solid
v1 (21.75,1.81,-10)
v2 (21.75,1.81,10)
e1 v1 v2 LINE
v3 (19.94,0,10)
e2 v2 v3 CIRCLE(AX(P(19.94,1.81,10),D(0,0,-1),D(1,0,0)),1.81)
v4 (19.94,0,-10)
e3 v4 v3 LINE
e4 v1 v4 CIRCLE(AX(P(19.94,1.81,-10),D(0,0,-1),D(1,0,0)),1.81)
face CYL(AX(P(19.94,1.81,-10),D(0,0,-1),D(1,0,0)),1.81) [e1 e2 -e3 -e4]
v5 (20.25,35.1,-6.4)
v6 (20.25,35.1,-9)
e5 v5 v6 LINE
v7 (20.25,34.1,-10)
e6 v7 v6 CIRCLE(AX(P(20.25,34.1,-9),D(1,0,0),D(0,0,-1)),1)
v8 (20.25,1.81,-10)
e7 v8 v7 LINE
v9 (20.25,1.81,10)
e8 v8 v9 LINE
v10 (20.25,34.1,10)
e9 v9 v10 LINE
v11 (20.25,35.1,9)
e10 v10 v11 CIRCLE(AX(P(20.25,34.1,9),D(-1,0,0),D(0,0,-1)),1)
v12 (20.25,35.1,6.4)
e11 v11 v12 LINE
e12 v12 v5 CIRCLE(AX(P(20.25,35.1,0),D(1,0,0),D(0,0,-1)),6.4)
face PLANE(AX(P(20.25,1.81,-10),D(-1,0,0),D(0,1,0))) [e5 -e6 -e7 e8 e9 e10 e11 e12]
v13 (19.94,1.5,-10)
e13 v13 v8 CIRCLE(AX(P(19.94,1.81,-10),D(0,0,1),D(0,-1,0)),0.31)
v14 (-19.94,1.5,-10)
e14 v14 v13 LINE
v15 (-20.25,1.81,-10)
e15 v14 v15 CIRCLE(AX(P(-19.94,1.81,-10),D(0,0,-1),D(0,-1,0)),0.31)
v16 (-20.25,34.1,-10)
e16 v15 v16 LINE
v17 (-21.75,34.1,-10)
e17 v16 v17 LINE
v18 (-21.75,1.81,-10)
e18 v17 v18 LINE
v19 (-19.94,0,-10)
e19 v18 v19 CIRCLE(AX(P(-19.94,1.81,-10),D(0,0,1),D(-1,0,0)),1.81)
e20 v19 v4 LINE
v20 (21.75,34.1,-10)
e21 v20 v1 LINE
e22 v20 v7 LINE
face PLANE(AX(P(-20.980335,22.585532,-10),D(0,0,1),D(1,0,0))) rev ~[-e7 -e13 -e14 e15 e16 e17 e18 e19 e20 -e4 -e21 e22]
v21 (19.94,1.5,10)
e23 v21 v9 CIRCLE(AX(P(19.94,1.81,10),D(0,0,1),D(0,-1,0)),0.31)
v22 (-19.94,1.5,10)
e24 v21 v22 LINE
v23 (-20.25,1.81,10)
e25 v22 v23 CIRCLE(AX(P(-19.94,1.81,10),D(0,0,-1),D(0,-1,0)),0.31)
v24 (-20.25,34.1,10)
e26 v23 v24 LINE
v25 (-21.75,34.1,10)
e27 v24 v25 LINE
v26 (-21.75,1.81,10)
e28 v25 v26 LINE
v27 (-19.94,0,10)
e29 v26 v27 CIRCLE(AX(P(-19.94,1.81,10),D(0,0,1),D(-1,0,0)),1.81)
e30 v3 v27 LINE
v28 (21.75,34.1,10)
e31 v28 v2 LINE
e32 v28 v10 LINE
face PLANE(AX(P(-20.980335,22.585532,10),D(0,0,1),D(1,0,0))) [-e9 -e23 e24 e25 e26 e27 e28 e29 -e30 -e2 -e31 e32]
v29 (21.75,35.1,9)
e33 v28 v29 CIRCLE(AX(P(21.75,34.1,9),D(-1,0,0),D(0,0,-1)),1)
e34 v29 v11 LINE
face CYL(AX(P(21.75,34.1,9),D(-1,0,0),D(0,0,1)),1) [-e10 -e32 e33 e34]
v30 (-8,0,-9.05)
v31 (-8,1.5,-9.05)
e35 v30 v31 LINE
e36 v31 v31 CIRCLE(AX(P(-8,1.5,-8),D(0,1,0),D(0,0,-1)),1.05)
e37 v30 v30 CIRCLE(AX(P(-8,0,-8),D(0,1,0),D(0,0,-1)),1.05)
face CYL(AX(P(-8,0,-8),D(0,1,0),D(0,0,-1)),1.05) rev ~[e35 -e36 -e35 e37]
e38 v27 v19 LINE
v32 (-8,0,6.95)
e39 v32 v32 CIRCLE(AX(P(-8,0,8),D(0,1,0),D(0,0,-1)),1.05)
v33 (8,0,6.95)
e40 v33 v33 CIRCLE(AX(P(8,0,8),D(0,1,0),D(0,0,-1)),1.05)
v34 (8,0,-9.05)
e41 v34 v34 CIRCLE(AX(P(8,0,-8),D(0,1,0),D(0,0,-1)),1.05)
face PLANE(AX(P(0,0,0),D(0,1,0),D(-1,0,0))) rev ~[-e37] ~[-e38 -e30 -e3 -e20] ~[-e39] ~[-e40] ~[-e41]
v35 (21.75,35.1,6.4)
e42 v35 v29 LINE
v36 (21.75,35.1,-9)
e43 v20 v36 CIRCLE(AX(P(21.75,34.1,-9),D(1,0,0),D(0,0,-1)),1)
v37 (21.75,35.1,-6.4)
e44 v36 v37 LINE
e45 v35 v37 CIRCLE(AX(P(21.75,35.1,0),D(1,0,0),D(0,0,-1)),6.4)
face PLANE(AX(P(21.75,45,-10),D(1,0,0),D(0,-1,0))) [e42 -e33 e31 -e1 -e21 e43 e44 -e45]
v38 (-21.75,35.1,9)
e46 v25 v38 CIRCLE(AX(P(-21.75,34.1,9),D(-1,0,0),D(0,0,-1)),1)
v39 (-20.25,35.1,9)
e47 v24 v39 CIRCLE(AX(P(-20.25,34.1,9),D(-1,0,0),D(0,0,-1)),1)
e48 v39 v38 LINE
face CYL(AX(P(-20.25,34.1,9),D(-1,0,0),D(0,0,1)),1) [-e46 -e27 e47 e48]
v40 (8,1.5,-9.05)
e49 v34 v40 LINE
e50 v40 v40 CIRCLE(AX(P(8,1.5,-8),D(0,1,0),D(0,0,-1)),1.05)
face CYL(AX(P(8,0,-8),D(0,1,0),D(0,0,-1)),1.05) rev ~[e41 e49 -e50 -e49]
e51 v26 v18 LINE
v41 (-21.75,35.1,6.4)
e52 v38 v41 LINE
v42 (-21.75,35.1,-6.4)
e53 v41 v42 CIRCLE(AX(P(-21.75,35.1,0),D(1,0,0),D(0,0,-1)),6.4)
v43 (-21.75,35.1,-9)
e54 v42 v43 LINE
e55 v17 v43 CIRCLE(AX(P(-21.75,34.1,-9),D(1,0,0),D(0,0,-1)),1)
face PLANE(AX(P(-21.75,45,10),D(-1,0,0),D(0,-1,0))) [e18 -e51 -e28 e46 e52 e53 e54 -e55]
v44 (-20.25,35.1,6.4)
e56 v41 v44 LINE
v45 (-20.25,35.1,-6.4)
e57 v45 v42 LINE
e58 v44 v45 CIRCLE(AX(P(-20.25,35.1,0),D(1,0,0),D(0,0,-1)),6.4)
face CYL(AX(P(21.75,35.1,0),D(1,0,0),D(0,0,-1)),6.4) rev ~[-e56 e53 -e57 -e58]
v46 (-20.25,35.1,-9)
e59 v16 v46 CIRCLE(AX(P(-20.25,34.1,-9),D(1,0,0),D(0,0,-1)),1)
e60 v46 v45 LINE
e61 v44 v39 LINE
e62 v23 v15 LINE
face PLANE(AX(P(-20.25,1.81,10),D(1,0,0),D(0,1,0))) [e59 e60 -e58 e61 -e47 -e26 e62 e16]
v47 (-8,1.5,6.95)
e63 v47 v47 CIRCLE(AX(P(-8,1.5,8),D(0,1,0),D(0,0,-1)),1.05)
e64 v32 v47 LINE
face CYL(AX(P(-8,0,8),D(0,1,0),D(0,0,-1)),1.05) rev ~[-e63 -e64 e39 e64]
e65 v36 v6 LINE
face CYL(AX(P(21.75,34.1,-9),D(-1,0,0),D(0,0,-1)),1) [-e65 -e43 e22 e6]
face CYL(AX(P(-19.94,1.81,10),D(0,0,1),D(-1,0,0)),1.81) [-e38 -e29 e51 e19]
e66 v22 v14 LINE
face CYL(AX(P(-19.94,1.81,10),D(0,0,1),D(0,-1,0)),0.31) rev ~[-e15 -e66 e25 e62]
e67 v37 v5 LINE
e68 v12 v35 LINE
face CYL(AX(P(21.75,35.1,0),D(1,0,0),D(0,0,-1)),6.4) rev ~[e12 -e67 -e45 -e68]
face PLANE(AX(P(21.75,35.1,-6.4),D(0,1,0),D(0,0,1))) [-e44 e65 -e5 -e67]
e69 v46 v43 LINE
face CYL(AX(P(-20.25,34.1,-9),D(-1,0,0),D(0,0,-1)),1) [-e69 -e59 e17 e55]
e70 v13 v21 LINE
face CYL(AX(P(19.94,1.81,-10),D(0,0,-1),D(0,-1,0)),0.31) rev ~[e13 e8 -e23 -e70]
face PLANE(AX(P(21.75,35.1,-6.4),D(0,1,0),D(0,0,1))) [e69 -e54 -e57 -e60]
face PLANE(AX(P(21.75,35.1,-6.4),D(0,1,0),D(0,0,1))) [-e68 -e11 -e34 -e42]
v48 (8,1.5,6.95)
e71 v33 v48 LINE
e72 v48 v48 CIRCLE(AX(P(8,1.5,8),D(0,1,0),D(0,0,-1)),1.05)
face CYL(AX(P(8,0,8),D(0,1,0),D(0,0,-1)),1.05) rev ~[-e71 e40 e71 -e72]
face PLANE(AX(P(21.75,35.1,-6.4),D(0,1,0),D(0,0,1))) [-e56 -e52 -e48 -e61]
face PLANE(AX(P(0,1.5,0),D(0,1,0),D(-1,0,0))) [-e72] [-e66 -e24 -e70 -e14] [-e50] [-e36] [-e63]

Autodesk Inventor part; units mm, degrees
ref_plane "YZ Plane" through (0, 0, 0) normal (1, 0, 0) x (0, 1, 0)
ref_plane "XZ Plane" through (0, 0, 0) normal (0, 1, 0) x (-1, 0, 0)
ref_plane "XY Plane" through (0, 0, 0) normal (0, 0, 1) x (1, 0, 0)
sketch "Sketch1" plane through (0, 0, 0) normal (0, 1, 0) x (-1, 0, 0)
  line L0 (20.25, -10) -> (-20.25, -10)
  line L1 (-20.25, -10) -> (-20.25, 10)
  line L2 (-20.25, 10) -> (20.25, 10)
  line L3 (20.25, 10) -> (20.25, -10)
  point P0 (0, 0)
  dimension "d0" = 40.5
  dimension "d1" = 20
  dimension "d2" = 10
  dimension "d3" = 20.25
extrude "Plate1" add sketch "Sketch1" along normal blind 1.5
sketch "Sketch2" plane through (21.75, 0, -10) normal (-1, 0, 0) x (0, -1, 0)
  line L0 (0, 20) -> (0, 0)
  line L1 (0, 0) -> (-45, 0)
  line L2 (-45, 0) -> (-45, 20)
  line L3 (-45, 20) -> (0, 20)
edge flange "Flange1" height 45 angle 90 thickness 1.5 bend radius 0.31 thickness toward (-1, 0, 0) relief tear relief width 1.5 relief depth 0.75 edges at (20.25, 1.5, 0) wall of the first edge with corners at (21.75, 0, 10) (21.75, 0, -10) (21.75, 45, -10) (21.75, 45, 10)
bend "Bend1"
corner "Corner1"
sketch "Sketch3" plane through (-21.75, 0, 10) normal (1, 0, 0) x (0, 1, 0)
  line L0 (0, -20) -> (0, 0)
  line L1 (0, 0) -> (45, 0)
  line L2 (45, 0) -> (45, -20)
  line L3 (45, -20) -> (0, -20)
edge flange "Flange2" height 45 angle 90 thickness 1.5 bend radius 0.31 thickness toward (1, 0, 0) relief tear relief width 1.5 relief depth 0.75 edges at (-20.25, 1.5, 0) wall of the first edge with corners at (-21.75, 0, -10) (-21.75, 0, 10) (-21.75, 45, 10) (-21.75, 45, -10)
bend "Bend2"
corner "Corner2"
sketch "Sketch4" plane through (21.75, 45, 10) normal (1, 0, 0) x (0, 0, -1)
  circle A0 centre (10, -9.9) radius 6.4
  line L0 (0, 0) -> (20, 0) projected
  line L1 (20, 0) -> (20, -43.19) projected
  point P0 (10, -45)
  dimension "d25" = 9.9
  dimension "d26" = 12.8
  dimension "d27" = 10
extrude "Extrusion1" cut sketch "Sketch4" against normal blind 50
sketch "Sketch5" plane through (21.75, 45, 10) normal (1, 0, 0) x (0, 0, -1)
  circle A0 centre (10, -9.9) radius 6.4 projected
  line L0 (0, 0) -> (20, 0) projected
  line L1 (-4, 0) -> (24, 0)
  line L2 (24, 0) -> (24, -9.9)
  line L3 (24, -9.9) -> (-4, -9.9)
  line L4 (-4, -9.9) -> (-4, 0)
  line L5 (0, -43.19) -> (0, 0) projected
  point P0 (10, -45)
  dimension "d30" = 9.9
  dimension "d31" = 28
  dimension "d32" = 4
extrude "Extrusion2" cut sketch "Sketch5" against normal blind 50 contours L3 A0 | A0 L3 L5 L0 L1 L2 | L3 L4 L1 L5 picked at (9.2435, -7.9053)
fillet "Fillet1" radius 1 4 edges at (-21, 35.1, 10) (-21, 35.1, -10) (21, 35.1, -10) (21, 35.1, 10)
sketch "Sketch8" plane through (0, 0, 0) normal (0, -1, 0) x (1, 0, 0)
  circle A0 centre (8, -8) radius 1.05 projected
  circle A1 centre (-8, -8) radius 1.05 projected
  circle A2 centre (8, 8) radius 1.05 projected
  circle A3 centre (-8, 8) radius 1.05 projected
  point P0 (0, 0)
hole "Hole3" at (8, 0, -8) at (-8, 0, -8) at (-8, 0, 8) at (8, 0, 8) direction (0, 1, 0) diameter 2.1 depth 1.5
equation "\"d55\" = Thickness"
equation "\"d4\" = Thickness"
equation "\"d5\" = BendReliefWidth"
equation "\"d6\" = BendReliefDepth"
equation "\"d7\" = MinimumRemnant"
equation "\"d8\" = TransitionRadius"
equation "\"d11\" = BendRadius"
equation "\"d12\" = CornerReliefSize"
equation "\"d13\" = GapSize"
equation "\"d14\" = JacobiRadiusSize"
equation "\"d15\" = BendReliefWidth"
equation "\"d16\" = BendReliefDepth"
equation "\"d17\" = MinimumRemnant"
equation "\"d18\" = TransitionRadius"
equation "\"d21\" = BendRadius"
equation "\"d22\" = CornerReliefSize"
equation "\"d23\" = GapSize"
equation "\"d24\" = JacobiRadiusSize"
equation "\"BendReliefWidth\" = Thickness"
equation "\"BendReliefDepth\" = 0.5 * Thickness"
equation "\"CornerReliefSize\" = 4 * Thickness"
equation "\"MinimumRemnant\" = 2 * Thickness"
equation "\"TransitionRadius\" = BendRadius"
equation "\"JacobiRadiusSize\" = BendRadius"
equation "\"GapSize\" = Thickness"
equation "\"Thickness\" = 1.5"
equation "\"BendRadius\" = 0.31"
properties part number "axis_10_top_frame" material "Aluminum 6061-AHC"
